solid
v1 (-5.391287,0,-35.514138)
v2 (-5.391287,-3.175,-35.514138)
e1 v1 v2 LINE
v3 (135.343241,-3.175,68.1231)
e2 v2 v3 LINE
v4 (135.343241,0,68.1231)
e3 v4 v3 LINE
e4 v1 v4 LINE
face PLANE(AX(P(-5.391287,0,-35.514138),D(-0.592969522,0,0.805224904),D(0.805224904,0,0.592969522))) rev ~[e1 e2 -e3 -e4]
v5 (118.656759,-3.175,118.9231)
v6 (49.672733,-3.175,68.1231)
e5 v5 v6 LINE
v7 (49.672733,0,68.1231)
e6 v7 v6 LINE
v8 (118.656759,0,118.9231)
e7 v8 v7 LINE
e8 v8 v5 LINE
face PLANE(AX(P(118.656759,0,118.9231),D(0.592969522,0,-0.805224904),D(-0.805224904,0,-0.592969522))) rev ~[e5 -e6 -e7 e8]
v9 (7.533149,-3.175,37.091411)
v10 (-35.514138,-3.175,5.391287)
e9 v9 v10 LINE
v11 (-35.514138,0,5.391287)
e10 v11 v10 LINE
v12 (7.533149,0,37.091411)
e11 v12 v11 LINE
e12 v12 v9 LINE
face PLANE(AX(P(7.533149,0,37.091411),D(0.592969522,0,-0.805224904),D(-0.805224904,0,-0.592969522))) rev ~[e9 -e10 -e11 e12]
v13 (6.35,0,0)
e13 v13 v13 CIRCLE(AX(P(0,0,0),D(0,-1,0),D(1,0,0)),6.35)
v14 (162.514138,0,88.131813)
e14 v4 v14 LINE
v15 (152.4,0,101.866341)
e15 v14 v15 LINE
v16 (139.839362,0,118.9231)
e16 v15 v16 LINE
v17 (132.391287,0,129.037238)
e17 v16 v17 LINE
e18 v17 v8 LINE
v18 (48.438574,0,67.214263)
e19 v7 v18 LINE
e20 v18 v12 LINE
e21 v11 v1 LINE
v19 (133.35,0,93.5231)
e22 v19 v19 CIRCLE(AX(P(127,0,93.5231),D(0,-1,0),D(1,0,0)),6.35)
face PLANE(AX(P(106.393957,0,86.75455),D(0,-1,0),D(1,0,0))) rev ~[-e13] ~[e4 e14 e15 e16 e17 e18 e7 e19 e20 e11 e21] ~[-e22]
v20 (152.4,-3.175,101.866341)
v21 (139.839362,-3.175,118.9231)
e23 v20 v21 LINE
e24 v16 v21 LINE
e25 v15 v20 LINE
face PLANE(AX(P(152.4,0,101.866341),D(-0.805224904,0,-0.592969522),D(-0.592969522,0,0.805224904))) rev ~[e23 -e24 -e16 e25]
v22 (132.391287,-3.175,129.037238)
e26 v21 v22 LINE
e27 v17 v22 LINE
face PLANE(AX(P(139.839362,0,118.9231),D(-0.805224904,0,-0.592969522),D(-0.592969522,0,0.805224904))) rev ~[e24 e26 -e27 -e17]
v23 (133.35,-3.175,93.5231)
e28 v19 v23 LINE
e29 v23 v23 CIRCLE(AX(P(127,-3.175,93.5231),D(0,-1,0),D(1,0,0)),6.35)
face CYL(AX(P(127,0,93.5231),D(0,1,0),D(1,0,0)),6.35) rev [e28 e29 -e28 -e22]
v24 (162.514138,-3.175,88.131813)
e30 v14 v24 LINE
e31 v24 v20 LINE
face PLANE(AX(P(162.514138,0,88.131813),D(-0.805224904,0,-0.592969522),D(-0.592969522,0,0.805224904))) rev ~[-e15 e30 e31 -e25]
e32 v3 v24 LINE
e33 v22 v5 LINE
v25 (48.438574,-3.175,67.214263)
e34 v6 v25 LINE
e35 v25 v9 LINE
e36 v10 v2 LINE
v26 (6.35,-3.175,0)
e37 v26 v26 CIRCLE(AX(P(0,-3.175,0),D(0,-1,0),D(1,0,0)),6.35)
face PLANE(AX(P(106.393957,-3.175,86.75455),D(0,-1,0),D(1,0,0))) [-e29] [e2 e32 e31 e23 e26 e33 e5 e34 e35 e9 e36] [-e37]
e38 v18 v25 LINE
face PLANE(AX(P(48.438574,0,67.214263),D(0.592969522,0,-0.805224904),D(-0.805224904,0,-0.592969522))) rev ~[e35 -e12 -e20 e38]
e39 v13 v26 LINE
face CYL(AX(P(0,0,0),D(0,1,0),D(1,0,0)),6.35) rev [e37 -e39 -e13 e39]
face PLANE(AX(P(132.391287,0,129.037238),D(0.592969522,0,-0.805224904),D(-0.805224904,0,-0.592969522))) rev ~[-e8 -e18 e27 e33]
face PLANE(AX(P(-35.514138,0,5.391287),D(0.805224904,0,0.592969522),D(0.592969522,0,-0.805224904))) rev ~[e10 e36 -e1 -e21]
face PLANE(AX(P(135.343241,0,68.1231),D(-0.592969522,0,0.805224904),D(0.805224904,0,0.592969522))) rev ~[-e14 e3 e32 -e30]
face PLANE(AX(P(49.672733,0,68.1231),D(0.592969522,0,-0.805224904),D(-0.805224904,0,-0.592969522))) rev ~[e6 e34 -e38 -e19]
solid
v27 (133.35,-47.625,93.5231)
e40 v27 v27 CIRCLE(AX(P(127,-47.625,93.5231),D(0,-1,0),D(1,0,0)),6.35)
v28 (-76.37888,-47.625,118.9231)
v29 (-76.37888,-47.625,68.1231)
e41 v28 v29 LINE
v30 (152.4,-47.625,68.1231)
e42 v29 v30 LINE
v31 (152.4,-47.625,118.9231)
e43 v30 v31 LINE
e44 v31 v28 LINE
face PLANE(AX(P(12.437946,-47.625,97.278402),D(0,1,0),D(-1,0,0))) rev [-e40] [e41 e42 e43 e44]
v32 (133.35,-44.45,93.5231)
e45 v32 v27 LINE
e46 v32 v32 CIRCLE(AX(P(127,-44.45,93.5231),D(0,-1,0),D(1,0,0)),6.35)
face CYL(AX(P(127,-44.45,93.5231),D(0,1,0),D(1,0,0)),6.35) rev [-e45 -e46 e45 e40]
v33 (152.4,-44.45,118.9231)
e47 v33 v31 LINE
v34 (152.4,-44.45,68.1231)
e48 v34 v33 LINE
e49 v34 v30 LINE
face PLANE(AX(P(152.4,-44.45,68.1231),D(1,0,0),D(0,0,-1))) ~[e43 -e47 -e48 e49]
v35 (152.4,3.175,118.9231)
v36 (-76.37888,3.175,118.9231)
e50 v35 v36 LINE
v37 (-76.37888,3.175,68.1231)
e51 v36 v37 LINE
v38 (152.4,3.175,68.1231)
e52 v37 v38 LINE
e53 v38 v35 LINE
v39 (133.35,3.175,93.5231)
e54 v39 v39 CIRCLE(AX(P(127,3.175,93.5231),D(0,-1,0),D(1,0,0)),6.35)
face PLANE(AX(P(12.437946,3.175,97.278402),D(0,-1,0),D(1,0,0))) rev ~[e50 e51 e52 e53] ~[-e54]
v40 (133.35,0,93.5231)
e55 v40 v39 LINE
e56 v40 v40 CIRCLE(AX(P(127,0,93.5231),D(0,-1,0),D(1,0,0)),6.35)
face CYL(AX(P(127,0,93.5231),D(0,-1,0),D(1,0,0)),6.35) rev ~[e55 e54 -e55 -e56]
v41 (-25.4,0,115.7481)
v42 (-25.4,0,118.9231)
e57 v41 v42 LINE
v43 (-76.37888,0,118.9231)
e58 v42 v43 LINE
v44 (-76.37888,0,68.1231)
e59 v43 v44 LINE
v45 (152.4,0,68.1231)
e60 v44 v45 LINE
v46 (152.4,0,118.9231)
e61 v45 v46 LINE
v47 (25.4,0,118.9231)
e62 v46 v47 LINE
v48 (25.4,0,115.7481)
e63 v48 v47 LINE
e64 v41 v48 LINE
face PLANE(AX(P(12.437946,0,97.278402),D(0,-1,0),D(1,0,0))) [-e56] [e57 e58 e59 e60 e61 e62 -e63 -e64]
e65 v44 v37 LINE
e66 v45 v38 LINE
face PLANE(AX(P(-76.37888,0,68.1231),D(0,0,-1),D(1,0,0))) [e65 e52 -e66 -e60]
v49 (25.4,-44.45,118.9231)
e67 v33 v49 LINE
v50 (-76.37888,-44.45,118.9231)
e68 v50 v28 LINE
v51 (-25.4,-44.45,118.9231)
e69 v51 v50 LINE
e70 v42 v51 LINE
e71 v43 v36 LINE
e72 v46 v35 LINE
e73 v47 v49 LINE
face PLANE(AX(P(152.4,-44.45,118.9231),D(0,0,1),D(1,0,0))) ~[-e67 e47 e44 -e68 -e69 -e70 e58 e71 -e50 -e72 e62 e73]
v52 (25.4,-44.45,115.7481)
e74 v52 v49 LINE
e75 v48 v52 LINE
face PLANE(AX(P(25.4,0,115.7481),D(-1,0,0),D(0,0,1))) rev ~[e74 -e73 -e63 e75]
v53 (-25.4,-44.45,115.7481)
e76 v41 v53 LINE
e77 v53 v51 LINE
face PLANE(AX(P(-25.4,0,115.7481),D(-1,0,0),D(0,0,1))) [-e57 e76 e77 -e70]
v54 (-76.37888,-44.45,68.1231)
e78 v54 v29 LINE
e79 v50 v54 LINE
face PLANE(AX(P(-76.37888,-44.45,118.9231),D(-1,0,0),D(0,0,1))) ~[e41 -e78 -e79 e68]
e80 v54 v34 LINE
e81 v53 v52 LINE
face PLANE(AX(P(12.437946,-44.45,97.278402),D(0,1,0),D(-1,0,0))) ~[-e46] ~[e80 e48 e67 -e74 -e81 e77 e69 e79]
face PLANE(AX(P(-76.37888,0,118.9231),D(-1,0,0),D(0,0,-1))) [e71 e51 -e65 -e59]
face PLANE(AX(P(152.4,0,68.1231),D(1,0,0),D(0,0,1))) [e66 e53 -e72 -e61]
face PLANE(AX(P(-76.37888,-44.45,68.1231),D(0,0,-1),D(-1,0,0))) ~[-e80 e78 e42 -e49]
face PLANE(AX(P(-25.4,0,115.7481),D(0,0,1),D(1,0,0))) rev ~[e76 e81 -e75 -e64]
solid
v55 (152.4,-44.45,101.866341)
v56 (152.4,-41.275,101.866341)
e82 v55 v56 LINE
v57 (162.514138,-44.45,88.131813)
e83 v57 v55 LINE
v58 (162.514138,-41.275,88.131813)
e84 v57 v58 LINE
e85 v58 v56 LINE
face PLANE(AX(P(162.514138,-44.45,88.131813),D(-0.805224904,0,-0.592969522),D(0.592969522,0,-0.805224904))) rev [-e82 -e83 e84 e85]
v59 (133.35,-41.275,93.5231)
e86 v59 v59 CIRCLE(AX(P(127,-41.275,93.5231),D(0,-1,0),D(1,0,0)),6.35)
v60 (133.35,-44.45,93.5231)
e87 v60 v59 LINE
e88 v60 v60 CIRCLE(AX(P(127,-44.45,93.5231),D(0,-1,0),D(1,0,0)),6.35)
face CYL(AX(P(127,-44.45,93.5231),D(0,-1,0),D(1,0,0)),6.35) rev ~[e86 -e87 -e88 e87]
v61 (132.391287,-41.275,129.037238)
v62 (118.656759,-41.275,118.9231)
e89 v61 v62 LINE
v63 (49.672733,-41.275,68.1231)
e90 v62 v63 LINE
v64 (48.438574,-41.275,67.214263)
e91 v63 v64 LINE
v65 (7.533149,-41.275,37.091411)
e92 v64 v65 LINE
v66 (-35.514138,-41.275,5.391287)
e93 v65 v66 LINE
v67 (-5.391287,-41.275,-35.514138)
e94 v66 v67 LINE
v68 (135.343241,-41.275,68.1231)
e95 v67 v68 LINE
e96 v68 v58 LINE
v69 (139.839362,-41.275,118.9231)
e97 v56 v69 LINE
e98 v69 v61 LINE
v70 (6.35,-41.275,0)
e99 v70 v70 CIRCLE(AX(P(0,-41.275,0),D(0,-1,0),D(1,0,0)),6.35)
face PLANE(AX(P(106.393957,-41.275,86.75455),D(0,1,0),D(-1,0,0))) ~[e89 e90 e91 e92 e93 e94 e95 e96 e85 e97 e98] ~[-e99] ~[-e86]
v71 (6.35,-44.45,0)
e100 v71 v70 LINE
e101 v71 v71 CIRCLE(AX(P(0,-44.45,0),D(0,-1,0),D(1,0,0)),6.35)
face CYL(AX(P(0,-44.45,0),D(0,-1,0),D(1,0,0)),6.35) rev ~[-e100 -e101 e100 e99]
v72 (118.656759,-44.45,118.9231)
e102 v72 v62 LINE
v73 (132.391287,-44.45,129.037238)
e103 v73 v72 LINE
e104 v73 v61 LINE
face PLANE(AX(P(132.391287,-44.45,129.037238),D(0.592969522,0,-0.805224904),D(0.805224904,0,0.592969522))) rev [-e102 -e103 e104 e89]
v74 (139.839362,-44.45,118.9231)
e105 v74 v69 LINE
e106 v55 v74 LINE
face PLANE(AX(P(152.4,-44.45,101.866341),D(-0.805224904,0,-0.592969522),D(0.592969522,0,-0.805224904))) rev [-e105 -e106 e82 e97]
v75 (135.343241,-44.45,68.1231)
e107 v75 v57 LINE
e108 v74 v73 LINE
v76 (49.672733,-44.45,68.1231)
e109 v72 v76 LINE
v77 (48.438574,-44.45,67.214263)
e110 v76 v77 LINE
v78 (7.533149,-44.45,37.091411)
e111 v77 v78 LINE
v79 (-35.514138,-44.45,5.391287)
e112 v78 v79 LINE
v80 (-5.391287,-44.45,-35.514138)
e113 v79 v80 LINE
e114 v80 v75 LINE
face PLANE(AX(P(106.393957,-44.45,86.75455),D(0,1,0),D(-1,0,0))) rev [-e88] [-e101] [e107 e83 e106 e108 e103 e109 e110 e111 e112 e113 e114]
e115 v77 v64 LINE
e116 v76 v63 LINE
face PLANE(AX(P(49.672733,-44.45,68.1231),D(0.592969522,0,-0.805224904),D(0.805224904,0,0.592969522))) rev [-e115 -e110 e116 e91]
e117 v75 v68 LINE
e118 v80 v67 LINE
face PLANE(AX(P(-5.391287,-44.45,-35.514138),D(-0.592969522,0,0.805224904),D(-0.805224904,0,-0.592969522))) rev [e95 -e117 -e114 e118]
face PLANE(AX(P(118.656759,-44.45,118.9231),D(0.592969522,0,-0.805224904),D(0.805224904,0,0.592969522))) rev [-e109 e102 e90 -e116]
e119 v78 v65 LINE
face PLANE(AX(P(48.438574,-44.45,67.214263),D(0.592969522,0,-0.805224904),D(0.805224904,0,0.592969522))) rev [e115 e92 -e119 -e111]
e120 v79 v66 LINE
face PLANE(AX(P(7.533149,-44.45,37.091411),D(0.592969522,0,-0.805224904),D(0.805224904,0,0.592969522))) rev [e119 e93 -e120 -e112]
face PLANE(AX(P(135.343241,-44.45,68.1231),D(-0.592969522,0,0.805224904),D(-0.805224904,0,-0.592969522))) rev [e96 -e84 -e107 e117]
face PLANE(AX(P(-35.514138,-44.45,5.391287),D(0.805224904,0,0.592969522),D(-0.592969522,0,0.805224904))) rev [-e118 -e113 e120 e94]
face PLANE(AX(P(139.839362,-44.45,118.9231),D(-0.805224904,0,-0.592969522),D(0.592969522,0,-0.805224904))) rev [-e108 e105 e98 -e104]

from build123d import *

# Parameters (mm, degrees)
F0_R     = 6.35
F1_DEPTH = 3.175
F0_W     = 50.8
F0_H     = 3.175
F2_DEPTH = 3.175
F5_DEPTH = 44.45


# Not quite as in the source:
# - a feature names something its author has since deleted; it is built from what else it names


with BuildPart() as f1:
    # F0 (on Front) → F1 (new body)
    with BuildSketch(Plane.XZ):
        Polygon((118.6567593262, 118.9230999827), (49.6727329072, 68.1230999827), (135.3432406738, 68.1230999827), (152.4, 80.6837378398), (152.4, 101.8663406565), (139.8393621429, 118.9230999827), align=None)
        with Locations((127, 93.5230999827)):
            Circle(F0_R, mode=Mode.SUBTRACT)
        Polygon((152.4, 101.8663406565), (152.4, 80.6837378398), (162.5141384166, 88.1318132601), align=None)
        Polygon((132.3912867226, 129.0372383994), (118.6567593262, 118.9230999827), (139.8393621429, 118.9230999827), align=None)
        Polygon((49.6727329072, 68.1230999827), (48.438574153, 67.214262561), (50.3212523839, 64.6576734898), (9.4158272446, 34.5348217958), (7.5331490138, 37.091410867), (-35.5141384166, 5.3912867226), (-5.3912867226, -35.5141384166), (135.3432406738, 68.1230999827), align=None)
        Circle(F0_R, mode=Mode.SUBTRACT)
        Polygon((50.3212523839, 64.6576734898), (48.438574153, 67.214262561), (7.5331490138, 37.091410867), (9.4158272446, 34.5348217958), align=None)
    extrude(amount=F1_DEPTH)


with BuildPart() as f2:
    # F0 (on Front) → F2 (new body)
    with BuildSketch(Plane.XZ):
        Polygon((-76.3788797785, 68.1230999827), (49.6727329072, 68.1230999827), (118.6567593262, 118.9230999827), (25.4, 118.9230999827), (25.4, 115.7480999827), (-25.4, 115.7480999827), (-25.4, 118.9230999827), (-76.3788797785, 118.9230999827), align=None)
        Polygon((118.6567593262, 118.9230999827), (49.6727329072, 68.1230999827), (135.3432406738, 68.1230999827), (152.4, 80.6837378398), (152.4, 101.8663406565), (139.8393621429, 118.9230999827), align=None)
        with Locations((127, 93.5230999827)):
            Circle(F0_R, mode=Mode.SUBTRACT)
        Polygon((152.4, 80.6837378398), (135.3432406738, 68.1230999827), (152.4, 68.1230999827), align=None)
        Polygon((152.4, 118.9230999827), (139.8393621429, 118.9230999827), (152.4, 101.8663406565), align=None)
        with Locations((0, 117.3355999827)):
            Rectangle(F0_W, F0_H)
    extrude(amount=-F2_DEPTH)


with BuildPart() as f4_1:
    # F4: instance of F1
    add(f1.part.mirror(Plane(origin=(63.5, -22.225, 46.7615499914), x_dir=(1, 0, 0), z_dir=(0, -1, 0))))


with BuildPart() as f4_2:
    # F4: instance of F2
    add(f2.part.mirror(Plane(origin=(63.5, -22.225, 46.7615499914), x_dir=(1, 0, 0), z_dir=(0, -1, 0))))


with BuildPart() as f2_1:
    add(f2.part)

    add(f4_2.part)  # F5 merges F4_2
    # F0 (on Front) → F5 (join, through all)
    with BuildSketch(Plane.XZ):
        with Locations((0, 117.3355999827)):
            Rectangle(F0_W, F0_H)
    extrude(amount=F5_DEPTH)


solid = Compound([f1.part, f4_1.part, f2_1.part])
